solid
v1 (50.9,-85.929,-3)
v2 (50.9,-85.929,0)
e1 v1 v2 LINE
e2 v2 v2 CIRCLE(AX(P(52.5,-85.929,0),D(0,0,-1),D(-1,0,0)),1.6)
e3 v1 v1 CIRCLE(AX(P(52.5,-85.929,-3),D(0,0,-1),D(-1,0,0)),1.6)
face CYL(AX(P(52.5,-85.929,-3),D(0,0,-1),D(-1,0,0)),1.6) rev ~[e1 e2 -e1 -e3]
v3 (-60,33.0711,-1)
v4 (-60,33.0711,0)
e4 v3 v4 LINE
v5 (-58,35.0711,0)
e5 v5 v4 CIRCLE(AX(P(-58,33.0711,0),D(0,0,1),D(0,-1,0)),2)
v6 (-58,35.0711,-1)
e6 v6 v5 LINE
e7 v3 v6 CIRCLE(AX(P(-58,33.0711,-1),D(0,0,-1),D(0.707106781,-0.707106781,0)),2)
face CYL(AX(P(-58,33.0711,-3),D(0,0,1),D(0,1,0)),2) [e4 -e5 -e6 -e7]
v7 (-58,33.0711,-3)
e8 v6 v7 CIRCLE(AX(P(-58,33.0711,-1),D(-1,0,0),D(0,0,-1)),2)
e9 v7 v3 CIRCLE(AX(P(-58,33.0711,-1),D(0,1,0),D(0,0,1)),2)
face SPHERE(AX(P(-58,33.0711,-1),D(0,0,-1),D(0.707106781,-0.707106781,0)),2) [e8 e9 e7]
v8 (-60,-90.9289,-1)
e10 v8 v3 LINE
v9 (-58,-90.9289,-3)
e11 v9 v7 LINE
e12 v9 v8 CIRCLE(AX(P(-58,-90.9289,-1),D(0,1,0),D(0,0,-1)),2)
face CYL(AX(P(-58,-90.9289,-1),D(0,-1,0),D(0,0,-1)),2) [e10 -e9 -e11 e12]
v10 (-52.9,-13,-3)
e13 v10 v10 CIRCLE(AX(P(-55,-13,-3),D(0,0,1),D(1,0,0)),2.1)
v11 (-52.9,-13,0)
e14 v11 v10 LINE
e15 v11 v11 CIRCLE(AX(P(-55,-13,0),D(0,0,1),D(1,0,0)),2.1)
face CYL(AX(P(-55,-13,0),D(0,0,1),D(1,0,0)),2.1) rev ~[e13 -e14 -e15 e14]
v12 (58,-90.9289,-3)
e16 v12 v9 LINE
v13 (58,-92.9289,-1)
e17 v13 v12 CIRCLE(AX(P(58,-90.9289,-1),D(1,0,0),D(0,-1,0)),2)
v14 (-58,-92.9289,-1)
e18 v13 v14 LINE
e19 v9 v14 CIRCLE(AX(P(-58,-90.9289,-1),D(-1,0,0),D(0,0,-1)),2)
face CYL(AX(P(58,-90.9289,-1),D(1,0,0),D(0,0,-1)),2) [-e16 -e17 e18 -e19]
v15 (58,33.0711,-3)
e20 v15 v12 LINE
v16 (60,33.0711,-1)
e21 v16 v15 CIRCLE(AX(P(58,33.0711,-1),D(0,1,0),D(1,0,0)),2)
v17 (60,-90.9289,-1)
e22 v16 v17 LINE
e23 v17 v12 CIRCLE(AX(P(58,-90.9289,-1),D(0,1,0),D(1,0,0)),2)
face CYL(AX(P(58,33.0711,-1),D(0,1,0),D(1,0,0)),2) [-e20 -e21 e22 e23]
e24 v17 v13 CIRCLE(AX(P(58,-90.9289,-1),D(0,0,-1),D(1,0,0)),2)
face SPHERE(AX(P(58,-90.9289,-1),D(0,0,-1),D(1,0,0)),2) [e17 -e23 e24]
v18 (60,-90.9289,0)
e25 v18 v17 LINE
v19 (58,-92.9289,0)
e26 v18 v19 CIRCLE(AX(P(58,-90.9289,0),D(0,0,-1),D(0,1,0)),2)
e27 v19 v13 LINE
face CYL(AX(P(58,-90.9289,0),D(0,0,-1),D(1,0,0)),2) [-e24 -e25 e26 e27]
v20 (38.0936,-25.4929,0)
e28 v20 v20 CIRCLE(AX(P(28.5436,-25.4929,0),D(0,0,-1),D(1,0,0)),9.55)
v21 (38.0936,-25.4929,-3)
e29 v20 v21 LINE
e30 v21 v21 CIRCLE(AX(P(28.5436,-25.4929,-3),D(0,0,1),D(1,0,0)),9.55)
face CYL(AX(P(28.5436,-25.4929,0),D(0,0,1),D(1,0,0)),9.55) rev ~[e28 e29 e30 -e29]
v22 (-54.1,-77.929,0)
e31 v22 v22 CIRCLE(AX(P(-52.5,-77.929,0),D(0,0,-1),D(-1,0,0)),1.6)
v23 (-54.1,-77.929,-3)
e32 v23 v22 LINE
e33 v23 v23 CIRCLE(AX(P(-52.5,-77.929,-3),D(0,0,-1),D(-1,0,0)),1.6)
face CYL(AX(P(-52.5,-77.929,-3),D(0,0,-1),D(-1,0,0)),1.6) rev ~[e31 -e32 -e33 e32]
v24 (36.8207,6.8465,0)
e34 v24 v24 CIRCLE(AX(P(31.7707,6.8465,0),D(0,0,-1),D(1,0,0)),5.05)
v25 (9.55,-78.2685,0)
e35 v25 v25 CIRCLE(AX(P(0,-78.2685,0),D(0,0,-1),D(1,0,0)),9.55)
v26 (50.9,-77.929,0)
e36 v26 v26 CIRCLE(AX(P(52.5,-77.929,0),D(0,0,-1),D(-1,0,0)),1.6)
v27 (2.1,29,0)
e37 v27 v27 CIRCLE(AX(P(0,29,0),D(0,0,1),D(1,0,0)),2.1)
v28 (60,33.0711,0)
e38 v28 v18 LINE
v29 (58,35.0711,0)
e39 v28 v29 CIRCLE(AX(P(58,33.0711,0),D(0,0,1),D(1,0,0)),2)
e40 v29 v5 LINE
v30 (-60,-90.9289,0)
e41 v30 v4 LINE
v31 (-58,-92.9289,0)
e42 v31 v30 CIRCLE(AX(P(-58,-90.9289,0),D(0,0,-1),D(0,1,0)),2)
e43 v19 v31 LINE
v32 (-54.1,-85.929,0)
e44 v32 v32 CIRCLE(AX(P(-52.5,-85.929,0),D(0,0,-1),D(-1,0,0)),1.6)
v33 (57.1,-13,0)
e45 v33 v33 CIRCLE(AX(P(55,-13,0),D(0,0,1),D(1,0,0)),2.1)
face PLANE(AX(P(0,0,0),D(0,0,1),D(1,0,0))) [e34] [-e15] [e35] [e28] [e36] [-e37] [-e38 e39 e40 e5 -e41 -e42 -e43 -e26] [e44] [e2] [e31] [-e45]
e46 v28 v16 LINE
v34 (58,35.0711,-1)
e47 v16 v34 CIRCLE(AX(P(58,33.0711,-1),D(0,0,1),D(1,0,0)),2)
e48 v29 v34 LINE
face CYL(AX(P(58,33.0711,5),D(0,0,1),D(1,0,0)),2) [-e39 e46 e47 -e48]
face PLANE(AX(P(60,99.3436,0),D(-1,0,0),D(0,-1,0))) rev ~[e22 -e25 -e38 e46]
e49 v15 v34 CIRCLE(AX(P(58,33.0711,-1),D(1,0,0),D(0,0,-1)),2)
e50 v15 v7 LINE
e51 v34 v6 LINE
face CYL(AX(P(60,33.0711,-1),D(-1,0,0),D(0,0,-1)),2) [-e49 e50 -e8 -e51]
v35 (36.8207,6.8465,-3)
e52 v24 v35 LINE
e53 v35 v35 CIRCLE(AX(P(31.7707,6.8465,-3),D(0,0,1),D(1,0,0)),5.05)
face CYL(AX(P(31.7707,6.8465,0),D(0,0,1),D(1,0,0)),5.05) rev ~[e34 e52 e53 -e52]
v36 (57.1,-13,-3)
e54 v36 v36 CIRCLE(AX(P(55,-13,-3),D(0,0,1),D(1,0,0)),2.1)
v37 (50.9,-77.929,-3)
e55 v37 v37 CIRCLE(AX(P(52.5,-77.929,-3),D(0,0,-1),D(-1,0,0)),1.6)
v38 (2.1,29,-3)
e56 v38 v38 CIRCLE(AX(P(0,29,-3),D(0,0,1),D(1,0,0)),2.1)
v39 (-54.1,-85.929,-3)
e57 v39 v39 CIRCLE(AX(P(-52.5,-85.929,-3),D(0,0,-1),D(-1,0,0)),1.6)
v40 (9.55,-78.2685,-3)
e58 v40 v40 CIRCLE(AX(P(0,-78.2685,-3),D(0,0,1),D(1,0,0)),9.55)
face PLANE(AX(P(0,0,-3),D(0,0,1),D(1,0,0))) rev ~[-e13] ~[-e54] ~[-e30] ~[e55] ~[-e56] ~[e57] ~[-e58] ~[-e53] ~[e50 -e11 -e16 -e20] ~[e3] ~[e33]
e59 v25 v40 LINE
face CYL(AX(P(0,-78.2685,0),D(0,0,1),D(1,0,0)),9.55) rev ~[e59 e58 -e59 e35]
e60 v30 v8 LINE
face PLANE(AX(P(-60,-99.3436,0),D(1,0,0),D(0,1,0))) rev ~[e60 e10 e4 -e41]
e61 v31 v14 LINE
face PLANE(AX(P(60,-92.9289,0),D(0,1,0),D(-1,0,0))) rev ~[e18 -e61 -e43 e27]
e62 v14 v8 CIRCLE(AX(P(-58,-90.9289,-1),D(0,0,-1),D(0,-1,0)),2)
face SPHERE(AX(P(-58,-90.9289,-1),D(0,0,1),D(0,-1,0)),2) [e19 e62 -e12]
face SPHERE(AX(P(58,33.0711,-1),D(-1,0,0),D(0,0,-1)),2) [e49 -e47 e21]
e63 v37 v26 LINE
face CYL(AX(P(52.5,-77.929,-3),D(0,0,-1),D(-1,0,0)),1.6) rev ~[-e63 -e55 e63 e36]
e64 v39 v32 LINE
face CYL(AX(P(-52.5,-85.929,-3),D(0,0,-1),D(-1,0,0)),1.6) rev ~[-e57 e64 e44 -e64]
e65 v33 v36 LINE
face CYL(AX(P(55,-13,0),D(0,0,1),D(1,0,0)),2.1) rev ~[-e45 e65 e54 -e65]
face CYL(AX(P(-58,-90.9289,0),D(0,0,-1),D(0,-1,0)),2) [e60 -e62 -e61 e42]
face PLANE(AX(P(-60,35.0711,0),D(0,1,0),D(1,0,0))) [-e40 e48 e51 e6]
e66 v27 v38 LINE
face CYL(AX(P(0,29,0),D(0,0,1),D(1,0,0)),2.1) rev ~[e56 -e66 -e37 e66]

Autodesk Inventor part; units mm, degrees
ref_plane "YZ Plane" through (0, 0, 0) normal (1, 0, 0) x (0, 1, 0)
ref_plane "XZ Plane" through (0, 0, 0) normal (0, 1, 0) x (-1, 0, 0)
ref_plane "XY Plane" through (0, 0, 0) normal (0, 0, 1) x (1, 0, 0)
sketch "スケッチ3" plane through (0, 0, 0) normal (0, 0, 1) x (1, 0, 0)
  line L0 (60, -99.3436) -> (-60, -99.3436)
  line L1 (-60, -99.3436) -> (-60, 99.3436)
  line L2 (-60, 99.3436) -> (60, 99.3436)
  line L3 (60, 99.3436) -> (60, -99.3436)
  line L4 (60, -99.3436) -> (-60, 99.3436) construction
  line L5 (-60, -99.3436) -> (60, 99.3436) construction
  point P0 (0, 0)
  dimension "d25" = 120
extrude "押し出し1" add sketch "スケッチ3" against normal blind 3
sketch "スケッチ4" plane through (0, 0, 0) normal (0, 0, 1) x (1, 0, 0)
  line L0 (0, 45.0711) -> (68.3595, 45.0711)
  line L1 (68.3595, 45.0711) -> (-74.3824, 45.0711)
  line L2 (-74.3824, 45.0711) -> (108.1656, 45.0711)
  line L3 (108.1656, 45.0711) -> (108.1656, 129.4154)
  line L4 (108.1656, 129.4154) -> (-74.3824, 129.4154)
  line L5 (-74.3824, 129.4154) -> (-74.3824, 45.0711)
  point P0 (0, 0)
extrude "押し出し4" cut sketch "スケッチ4" against normal blind 10
sketch "スケッチ13" plane through (0, 0, 0) normal (0, 0, 1) x (1, 0, 0)
  circle A0 centre (0, 0) radius 7.5
  circle A1 centre (0, 0) radius 32.5
  circle A2 centre (31.7707, 6.8465) radius 25
  circle A3 centre (31.7707, 6.8465) radius 7.5
  circle A4 centre (31.7707, 6.8465) radius 32.5
  circle A5 centre (28.5436, -25.4929) radius 25
  circle A6 centre (28.5436, -25.4929) radius 20
  circle A7 centre (28.5436, -25.4929) radius 60
  circle A8 centre (0, -78.2685) radius 40
  circle A9 centre (0, -78.2685) radius 50
  circle A10 centre (31.7707, 6.8465) radius 5.05
  circle A11 centre (28.5436, -25.4929) radius 9.55
  circle A12 centre (0, -78.2685) radius 9.55
  dimension "d87" = 65
  dimension "d89" = 65
  dimension "d91" = 120
  dimension "d86" = 15
  dimension "d88" = 15
  dimension "d90" = 40
  dimension "d92" = 100
  dimension "d96" = 10.1
  dimension "d97" = 19.1
  dimension "d98" = 19.1
extrude "押し出し16" cut sketch "スケッチ13" against normal blind 10 contours A10 A1 | A1 A10 | A11 A1 A2 | A2 A1 A4 A11 | A4 A1 A11 | A2 A11 A4 A1 | A1 A11 A2 | A4 A11 A1 | A12 A7 | A7 A12
sketch "スケッチ14" plane through (0, 0, 0) normal (0, 0, 1) x (1, 0, 0)
  point P0 (0, 0)
sketch "スケッチ15" plane through (0, 0, 0) normal (0, 0, 1) x (1, 0, 0)
  line L0 (-60, -99.3436) -> (-60, 45.0711) projected
  line L1 (60, 45.0711) -> (60, -99.3436) projected
  line L2 (-60, 45.0711) -> (60, 45.0711)
  line L3 (60, 45.0711) -> (60, -92.9289)
  line L4 (60, -92.9289) -> (-60, -92.9289)
  line L5 (-60, -92.9289) -> (-60, 45.0711)
  point P0 (0, 0)
  dimension "d101" = 138
extrude "押し出し17" cut sketch "スケッチ15" against normal blind 10 keep common part
sketch "スケッチ16" plane through (-60, 45.0711, 0) normal (0, 1, 0) x (1, 0, 0)
  line L0 (-11.4218, 21.1899) -> (145.405, 21.1899)
  line L1 (145.405, 21.1899) -> (145.405, -40.3361)
  line L2 (145.405, -40.3361) -> (-11.4218, -40.3361)
  line L3 (-11.4218, -40.3361) -> (-11.4218, 21.1899)
  point P0 (60, 0)
extrude "押し出し18" cut sketch "スケッチ16" against normal blind 10
sketch "スケッチ17" plane through (0, 0, 0) normal (0, 0, 1) x (1, 0, 0)
  circle A0 centre (31.7707, 6.8465) radius 5
  circle A1 centre (31.7707, 6.8465) radius 25
  circle A2 centre (28.5436, -25.4929) radius 9.5
  circle A3 centre (28.5436, -25.4929) radius 25
  circle A4 centre (55, -13) radius 2.1
  circle A5 centre (-55, -13) radius 2.1
  circle A6 centre (0, 29) radius 2.1
  point P0 (0, 0)
  point P1 (0, 0)
  dimension "d106" = 50
  dimension "d107" = 50
  dimension "d108" = 4.2
  dimension "d109" = 4.2
  dimension "d110" = 4.2
extrude "押し出し19" cut sketch "スケッチ17" against normal blind 10 contours A4 | A5 | A6
sketch "スケッチ18" plane through (0, 0, -3) normal (0, 0, -1) x (-1, 0, 0)
  circle A0 centre (52.5, -85.929) radius 1.6
  circle A1 centre (52.5, -77.929) radius 1.6
  circle A2 centre (-52.5, -77.929) radius 1.6
  circle A3 centre (-52.5, -85.929) radius 1.6
  point P0 (0, 0)
  dimension "d113" = 3.2
  dimension "d114" = 3.2
  dimension "d115" = 3.2
  dimension "d116" = 3.2
extrude "押し出し20" cut sketch "スケッチ18" against normal blind 10
fillet "フィレット2" radius 2 4 edges at (0, 35.0711, -3) (-60, 35.0711, -1.5) (-60, -92.9289, -1.5) (60, -92.9289, -1.5)
fillet "フィレット3" radius 2 8 edges at (60, 34.4853, -2.4142) (60, -28.9289, -3) (59.4142, -92.3431, -3) (0, -92.9289, -3) (-59.4142, -92.3431, -3) (-60, -28.9289, -3) (-59.4142, 34.4853, -2.4142) (60, 35.0711, -0.5)
properties part number "板2" material "アルミニウム 6061"
